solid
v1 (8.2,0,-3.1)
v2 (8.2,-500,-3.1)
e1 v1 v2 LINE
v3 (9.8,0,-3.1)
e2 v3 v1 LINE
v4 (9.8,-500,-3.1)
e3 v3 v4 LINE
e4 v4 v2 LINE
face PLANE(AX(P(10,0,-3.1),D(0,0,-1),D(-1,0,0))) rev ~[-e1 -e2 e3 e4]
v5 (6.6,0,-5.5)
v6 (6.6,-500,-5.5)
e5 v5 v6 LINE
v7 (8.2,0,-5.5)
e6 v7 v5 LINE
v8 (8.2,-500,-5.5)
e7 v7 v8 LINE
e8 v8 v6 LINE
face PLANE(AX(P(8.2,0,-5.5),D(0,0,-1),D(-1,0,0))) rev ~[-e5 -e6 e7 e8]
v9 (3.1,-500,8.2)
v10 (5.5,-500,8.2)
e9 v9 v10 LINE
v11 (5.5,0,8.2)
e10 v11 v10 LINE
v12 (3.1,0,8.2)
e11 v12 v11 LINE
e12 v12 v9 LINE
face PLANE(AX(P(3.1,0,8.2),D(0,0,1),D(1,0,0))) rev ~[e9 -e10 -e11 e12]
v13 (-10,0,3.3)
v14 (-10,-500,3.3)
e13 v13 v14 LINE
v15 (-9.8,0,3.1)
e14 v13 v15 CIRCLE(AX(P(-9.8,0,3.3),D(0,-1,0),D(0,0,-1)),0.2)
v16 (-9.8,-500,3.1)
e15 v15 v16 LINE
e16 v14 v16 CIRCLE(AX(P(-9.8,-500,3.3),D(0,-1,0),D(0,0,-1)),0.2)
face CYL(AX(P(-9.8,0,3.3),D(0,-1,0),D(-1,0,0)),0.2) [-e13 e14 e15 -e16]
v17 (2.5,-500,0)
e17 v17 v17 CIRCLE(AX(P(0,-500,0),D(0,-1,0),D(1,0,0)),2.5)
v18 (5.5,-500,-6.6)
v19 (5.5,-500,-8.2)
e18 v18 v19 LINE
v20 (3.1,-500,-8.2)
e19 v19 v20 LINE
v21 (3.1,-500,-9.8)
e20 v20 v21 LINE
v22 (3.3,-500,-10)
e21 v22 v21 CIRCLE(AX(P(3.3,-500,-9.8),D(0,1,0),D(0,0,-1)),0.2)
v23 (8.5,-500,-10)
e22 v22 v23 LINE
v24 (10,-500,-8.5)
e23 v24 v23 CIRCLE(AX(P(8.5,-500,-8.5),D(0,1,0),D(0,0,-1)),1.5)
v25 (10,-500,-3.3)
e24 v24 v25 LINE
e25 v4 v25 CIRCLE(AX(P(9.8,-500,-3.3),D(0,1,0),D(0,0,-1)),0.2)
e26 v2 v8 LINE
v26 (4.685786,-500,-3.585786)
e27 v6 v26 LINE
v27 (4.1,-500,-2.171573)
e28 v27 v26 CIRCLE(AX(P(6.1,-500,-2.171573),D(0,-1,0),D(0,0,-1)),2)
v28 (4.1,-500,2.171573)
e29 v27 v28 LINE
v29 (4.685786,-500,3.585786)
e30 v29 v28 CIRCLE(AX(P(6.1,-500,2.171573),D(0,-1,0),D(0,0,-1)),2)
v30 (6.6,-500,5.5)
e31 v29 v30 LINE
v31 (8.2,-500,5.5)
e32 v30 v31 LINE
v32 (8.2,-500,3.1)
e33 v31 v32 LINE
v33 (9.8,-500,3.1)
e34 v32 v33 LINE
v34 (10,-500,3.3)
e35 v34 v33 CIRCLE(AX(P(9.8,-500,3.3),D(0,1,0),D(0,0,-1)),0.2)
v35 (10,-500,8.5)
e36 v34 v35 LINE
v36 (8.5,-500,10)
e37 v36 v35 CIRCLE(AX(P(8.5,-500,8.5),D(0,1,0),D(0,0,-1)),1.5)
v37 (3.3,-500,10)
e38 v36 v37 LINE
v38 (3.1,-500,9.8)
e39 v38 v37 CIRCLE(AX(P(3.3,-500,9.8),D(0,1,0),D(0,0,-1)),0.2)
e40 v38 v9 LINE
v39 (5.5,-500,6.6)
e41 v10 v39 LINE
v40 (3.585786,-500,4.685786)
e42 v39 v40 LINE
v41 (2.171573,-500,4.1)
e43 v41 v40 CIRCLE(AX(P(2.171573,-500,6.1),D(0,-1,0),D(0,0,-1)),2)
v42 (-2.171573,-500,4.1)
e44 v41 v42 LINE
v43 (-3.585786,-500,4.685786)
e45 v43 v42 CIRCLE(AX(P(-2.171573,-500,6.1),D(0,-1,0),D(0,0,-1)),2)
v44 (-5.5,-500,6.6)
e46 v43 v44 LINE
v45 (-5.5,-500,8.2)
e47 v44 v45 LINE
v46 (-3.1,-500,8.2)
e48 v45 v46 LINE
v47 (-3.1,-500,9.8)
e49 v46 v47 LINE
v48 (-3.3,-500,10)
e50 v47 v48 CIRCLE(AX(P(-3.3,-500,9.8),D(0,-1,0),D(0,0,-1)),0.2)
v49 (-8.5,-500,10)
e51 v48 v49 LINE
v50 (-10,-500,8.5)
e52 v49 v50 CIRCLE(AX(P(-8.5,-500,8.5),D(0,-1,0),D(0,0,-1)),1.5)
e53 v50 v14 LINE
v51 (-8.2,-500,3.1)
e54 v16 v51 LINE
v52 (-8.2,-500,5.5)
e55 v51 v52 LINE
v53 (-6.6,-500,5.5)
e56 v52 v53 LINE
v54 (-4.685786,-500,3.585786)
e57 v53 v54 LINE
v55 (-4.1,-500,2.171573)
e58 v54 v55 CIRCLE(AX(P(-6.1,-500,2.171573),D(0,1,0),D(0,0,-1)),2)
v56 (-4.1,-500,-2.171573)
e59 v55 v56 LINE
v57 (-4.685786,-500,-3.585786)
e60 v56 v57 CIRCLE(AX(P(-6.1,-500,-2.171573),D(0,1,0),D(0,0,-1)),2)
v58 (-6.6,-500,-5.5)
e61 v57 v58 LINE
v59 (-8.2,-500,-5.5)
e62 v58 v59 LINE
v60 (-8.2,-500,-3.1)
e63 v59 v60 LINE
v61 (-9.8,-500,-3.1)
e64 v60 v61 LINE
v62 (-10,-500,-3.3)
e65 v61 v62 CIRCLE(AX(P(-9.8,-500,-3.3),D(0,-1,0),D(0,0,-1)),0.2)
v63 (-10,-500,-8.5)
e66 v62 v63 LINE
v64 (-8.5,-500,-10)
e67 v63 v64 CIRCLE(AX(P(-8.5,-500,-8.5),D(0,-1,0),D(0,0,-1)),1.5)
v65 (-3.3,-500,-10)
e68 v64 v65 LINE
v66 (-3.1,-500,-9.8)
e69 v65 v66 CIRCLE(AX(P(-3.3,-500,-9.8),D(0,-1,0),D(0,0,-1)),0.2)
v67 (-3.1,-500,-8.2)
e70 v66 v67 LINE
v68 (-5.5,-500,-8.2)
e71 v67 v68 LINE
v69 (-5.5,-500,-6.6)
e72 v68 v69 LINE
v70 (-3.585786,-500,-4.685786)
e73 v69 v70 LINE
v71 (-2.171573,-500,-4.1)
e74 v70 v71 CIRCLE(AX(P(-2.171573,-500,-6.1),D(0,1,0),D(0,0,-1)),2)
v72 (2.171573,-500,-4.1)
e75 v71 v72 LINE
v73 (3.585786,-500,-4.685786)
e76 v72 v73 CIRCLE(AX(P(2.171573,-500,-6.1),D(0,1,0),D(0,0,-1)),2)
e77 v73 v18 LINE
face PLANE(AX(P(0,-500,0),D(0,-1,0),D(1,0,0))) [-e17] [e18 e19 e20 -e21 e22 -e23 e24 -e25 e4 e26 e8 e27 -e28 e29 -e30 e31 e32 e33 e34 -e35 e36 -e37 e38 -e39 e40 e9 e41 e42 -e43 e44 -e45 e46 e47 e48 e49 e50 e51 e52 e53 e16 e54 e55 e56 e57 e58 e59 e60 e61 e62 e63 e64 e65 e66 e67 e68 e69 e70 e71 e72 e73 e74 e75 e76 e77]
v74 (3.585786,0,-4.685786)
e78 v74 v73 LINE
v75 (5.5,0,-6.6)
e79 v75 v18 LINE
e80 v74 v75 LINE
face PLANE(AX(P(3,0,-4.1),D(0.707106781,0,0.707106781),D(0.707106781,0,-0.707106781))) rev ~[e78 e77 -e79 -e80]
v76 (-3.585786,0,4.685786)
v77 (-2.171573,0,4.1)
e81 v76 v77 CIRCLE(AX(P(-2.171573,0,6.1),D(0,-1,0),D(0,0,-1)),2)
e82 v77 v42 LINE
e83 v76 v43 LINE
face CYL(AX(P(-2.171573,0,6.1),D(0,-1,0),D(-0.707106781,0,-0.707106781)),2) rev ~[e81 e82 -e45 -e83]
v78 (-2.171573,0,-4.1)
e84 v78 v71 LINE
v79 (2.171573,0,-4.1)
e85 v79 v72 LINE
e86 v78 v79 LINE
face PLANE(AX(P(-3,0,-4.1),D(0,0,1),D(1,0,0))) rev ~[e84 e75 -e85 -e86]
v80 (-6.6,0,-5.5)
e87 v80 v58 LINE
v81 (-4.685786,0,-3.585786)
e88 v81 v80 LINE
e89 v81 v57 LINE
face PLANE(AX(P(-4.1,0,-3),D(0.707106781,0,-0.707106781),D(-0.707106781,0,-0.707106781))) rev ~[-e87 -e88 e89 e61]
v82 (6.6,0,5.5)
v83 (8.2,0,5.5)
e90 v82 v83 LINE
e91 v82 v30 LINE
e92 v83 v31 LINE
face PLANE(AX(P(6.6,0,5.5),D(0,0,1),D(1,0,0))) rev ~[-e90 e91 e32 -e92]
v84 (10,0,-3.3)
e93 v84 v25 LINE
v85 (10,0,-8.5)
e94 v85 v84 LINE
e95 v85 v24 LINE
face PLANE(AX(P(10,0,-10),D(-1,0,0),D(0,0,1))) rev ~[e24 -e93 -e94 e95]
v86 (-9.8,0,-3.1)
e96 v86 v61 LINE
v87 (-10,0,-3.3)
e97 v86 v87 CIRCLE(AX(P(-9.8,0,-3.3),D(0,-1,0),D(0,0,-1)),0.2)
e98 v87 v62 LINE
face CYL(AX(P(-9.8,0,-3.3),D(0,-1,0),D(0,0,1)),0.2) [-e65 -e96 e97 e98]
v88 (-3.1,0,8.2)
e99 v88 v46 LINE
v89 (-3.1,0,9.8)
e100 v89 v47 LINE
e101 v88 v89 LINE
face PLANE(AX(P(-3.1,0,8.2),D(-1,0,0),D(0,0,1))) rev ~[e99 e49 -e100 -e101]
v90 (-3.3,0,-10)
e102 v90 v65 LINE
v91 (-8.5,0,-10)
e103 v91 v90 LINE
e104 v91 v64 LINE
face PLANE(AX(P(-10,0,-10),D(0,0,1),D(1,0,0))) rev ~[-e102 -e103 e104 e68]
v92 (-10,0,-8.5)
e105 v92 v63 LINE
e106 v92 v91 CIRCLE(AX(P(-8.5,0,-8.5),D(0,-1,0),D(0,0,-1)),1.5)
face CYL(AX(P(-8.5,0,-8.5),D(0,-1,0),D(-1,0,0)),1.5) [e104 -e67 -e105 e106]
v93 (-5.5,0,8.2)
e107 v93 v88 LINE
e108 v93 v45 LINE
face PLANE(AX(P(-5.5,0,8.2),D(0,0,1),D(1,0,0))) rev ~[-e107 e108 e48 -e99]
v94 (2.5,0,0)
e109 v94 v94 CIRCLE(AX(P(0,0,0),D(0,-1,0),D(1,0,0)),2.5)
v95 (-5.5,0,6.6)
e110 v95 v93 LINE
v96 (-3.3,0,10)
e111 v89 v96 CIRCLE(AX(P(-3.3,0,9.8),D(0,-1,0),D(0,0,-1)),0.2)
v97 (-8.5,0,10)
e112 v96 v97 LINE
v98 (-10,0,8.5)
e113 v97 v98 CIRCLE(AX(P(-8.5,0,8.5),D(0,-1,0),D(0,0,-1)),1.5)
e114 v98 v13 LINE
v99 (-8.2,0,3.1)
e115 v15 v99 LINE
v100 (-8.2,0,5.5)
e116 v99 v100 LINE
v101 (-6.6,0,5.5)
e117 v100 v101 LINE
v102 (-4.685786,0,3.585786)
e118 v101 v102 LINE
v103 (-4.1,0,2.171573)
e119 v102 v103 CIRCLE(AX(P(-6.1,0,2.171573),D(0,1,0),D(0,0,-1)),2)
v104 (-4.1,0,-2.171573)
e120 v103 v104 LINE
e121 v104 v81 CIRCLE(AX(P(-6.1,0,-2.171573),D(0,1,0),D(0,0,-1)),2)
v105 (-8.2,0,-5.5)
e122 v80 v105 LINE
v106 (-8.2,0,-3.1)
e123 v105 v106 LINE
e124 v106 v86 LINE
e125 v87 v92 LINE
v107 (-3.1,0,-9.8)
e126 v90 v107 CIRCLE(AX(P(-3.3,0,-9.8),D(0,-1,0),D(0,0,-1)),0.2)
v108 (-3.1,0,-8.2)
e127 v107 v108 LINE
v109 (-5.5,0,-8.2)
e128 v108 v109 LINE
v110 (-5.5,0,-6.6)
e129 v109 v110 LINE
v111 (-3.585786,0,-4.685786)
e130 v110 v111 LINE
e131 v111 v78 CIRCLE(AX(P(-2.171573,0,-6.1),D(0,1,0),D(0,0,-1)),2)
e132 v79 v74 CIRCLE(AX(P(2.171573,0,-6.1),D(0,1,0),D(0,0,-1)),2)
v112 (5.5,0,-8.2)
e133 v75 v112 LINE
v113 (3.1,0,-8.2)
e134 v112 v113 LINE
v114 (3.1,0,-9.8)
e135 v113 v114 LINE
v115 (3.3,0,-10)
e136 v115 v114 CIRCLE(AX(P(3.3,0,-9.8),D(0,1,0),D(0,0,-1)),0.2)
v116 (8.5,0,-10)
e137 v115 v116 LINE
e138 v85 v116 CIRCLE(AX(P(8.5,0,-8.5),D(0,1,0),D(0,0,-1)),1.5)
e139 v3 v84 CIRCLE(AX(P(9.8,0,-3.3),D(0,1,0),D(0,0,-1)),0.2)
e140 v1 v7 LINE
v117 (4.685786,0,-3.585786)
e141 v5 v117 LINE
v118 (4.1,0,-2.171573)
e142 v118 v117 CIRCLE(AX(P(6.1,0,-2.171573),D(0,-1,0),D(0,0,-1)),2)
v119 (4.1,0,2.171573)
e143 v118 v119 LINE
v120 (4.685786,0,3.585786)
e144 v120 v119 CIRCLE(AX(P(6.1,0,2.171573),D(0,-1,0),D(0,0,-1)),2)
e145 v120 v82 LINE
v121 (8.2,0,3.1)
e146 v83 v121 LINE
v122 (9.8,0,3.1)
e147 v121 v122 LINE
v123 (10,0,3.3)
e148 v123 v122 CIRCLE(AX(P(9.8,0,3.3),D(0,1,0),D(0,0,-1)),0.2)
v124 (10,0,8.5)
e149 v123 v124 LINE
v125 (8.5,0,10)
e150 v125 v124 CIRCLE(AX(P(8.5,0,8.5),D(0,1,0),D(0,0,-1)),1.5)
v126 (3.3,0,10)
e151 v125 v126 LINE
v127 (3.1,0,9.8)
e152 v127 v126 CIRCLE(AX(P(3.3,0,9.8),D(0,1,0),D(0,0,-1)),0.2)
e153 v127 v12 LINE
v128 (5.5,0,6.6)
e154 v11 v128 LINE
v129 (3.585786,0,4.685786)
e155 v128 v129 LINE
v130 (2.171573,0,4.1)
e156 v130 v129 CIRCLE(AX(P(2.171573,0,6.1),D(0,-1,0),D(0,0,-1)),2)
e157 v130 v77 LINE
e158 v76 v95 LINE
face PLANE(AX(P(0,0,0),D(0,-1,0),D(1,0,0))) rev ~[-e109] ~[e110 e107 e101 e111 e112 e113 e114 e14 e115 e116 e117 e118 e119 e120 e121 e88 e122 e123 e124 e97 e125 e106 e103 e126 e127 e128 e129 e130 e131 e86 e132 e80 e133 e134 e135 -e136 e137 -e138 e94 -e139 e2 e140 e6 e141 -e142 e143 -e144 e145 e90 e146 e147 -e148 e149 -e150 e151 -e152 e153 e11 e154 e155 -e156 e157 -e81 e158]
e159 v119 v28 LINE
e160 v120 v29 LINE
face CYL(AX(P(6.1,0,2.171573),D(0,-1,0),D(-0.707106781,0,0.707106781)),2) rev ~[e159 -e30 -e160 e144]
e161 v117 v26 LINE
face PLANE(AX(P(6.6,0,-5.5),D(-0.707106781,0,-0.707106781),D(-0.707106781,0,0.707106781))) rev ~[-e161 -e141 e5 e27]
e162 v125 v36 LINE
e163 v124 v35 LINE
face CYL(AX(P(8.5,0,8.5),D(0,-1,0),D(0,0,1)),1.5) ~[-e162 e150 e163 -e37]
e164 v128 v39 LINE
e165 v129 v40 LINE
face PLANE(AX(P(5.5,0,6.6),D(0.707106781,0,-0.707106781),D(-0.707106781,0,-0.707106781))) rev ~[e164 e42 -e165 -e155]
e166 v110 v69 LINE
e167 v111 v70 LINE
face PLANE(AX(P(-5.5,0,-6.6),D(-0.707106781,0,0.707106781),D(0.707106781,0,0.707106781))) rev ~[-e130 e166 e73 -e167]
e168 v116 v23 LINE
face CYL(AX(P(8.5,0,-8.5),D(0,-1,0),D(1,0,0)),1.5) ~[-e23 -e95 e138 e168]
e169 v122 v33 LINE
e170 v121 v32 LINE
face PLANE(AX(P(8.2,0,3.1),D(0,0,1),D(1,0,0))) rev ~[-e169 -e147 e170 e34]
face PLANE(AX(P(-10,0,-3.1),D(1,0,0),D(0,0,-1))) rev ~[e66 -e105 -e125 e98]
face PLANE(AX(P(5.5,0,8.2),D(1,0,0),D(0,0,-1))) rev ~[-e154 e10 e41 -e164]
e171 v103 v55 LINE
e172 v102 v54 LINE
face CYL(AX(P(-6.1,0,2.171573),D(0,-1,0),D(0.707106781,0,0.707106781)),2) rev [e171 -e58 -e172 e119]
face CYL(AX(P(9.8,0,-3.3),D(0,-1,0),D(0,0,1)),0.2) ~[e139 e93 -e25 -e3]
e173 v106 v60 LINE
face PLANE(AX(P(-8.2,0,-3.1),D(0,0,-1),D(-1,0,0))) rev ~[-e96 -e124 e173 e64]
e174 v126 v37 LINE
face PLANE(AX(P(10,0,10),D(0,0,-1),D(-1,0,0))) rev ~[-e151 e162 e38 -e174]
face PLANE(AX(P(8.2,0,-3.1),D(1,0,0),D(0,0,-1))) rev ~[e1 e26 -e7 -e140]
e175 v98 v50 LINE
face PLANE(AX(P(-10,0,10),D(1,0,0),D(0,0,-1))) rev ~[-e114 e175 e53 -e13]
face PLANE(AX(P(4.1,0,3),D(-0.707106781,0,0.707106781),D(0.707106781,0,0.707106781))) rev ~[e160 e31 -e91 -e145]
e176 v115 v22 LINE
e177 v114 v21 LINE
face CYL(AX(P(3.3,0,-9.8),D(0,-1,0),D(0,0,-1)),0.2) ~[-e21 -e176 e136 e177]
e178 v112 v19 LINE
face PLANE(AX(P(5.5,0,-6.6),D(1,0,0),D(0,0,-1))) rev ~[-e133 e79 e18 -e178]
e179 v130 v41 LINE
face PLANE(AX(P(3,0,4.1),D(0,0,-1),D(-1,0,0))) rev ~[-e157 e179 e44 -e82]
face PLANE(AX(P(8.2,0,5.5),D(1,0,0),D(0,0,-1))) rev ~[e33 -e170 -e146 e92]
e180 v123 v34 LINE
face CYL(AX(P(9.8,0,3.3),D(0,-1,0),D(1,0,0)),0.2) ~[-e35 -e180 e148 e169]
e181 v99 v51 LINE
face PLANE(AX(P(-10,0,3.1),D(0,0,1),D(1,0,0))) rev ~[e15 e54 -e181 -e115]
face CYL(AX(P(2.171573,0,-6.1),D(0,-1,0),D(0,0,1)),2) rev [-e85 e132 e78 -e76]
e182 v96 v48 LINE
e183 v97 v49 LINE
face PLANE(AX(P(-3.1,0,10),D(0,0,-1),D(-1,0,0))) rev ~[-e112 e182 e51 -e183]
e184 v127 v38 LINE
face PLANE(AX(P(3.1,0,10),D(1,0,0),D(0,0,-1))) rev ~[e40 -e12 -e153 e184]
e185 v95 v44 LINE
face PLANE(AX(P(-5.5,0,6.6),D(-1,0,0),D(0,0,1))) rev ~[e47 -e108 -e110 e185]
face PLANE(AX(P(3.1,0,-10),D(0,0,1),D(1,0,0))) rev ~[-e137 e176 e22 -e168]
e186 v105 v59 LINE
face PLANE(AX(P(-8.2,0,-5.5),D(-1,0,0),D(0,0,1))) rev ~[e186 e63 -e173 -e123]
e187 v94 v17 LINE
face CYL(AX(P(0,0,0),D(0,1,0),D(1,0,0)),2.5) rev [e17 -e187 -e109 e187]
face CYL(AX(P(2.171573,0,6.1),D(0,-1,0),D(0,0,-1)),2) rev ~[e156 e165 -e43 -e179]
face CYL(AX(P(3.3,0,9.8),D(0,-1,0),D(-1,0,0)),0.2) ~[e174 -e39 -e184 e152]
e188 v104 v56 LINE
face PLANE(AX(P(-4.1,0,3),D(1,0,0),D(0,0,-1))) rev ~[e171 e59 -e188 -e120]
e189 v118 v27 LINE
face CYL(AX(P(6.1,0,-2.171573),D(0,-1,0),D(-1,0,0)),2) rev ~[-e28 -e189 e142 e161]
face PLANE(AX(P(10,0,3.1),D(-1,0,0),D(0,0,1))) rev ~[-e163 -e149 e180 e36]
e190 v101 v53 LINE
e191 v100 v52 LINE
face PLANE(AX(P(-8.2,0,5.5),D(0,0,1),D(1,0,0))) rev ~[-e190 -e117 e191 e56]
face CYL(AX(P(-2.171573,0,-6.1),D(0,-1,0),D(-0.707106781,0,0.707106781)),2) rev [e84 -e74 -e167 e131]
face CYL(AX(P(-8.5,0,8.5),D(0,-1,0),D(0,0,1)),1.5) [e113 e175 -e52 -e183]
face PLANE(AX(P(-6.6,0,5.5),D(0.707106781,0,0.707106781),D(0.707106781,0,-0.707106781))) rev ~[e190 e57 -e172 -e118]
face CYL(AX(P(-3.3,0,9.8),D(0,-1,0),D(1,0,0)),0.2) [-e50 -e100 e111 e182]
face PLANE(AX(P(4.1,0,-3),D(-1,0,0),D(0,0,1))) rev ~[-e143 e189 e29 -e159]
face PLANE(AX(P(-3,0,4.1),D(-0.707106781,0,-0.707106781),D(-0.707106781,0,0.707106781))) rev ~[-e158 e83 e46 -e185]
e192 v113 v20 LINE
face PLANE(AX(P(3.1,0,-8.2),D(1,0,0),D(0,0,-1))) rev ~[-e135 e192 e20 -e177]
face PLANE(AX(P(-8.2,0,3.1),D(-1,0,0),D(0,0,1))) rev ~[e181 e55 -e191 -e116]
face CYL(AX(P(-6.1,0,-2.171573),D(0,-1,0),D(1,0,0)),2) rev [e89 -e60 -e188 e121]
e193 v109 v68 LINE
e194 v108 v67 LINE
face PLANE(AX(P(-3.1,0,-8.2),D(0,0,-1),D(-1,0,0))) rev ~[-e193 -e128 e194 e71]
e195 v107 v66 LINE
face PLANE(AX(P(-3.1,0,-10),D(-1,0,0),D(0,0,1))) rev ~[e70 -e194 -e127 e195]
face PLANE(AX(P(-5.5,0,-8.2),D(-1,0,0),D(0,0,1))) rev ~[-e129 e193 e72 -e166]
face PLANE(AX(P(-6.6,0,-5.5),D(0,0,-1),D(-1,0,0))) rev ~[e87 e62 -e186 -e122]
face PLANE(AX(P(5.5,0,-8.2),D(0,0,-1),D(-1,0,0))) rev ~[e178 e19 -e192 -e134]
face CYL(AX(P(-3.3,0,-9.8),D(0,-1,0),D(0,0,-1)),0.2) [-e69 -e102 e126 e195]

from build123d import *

# Parameters (mm, degrees)
F0_R     = 2.5
F1_DEPTH = 500
F2_R     = 1.5
F3_R     = 2
F4_R     = 0.2


# Not quite as in the source:
# - a feature names something its author has since deleted; it is built from what else it names


with BuildPart() as f1:
    # F0 (on Front) → F1 (new body)
    with BuildSketch(Plane.XZ):
        Polygon((-3.1, 10), (-10, 10), (-10, 3.1), (-8.2, 3.1), (-8.2, 5.5), (-6.6, 5.5), (-4.1, 3), (-4.1, -3), (-6.6, -5.5), (-8.2, -5.5), (-8.2, -3.1), (-10, -3.1), (-10, -10), (-3.1, -10), (-3.1, -8.2), (-5.5, -8.2), (-5.5, -6.6), (-3, -4.1), (0, -4.1), (3, -4.1), (5.5, -6.6), (5.5, -8.2), (3.1, -8.2), (3.1, -10), (10, -10), (10, -3.1), (8.2, -3.1), (8.2, -5.5), (6.6, -5.5), (4.1, -3), (4.1, 3), (6.6, 5.5), (8.2, 5.5), (8.2, 3.1), (10, 3.1), (10, 10), (3.1, 10), (3.1, 8.2), (5.5, 8.2), (5.5, 6.6), (3, 4.1), (0, 4.1), (-3, 4.1), (-5.5, 6.6), (-5.5, 8.2), (-3.1, 8.2), align=None)
        Circle(F0_R, mode=Mode.SUBTRACT)
    extrude(amount=F1_DEPTH)

    # F2
    f2_edges = [f1.edges().sort_by_distance(p)[0] for p in [
        (-10, -250, 10),
        (10, -250, 10),
        (10, -250, -10),
        (-10, -250, -10),
    ]]
    fillet(f2_edges, radius=F2_R)

    # F3
    f3_edges = [f1.edges().sort_by_distance(p)[0] for p in [
        (-4.1, -250, 3),
        (-4.1, -250, -3),
        (3, -250, 4.1),
        (-3, -250, 4.1),
        (4.1, -250, 3),
        (4.1, -250, -3),
        (3, -250, -4.1),
        (-3, -250, -4.1),
    ]]
    fillet(f3_edges, radius=F3_R)

    # F4
    f4_edges = [f1.edges().sort_by_distance(p)[0] for p in [
        (-10, -250, 3.1),
        (-3.1, -250, -10),
        (3.1, -250, -10),
        (10, -250, -3.1),
        (10, -250, 3.1),
        (-10, -250, -3.1),
        (3.1, -250, 10),
        (-3.1, -250, 10),
    ]]
    fillet(f4_edges, radius=F4_R)


solid = f1.part
